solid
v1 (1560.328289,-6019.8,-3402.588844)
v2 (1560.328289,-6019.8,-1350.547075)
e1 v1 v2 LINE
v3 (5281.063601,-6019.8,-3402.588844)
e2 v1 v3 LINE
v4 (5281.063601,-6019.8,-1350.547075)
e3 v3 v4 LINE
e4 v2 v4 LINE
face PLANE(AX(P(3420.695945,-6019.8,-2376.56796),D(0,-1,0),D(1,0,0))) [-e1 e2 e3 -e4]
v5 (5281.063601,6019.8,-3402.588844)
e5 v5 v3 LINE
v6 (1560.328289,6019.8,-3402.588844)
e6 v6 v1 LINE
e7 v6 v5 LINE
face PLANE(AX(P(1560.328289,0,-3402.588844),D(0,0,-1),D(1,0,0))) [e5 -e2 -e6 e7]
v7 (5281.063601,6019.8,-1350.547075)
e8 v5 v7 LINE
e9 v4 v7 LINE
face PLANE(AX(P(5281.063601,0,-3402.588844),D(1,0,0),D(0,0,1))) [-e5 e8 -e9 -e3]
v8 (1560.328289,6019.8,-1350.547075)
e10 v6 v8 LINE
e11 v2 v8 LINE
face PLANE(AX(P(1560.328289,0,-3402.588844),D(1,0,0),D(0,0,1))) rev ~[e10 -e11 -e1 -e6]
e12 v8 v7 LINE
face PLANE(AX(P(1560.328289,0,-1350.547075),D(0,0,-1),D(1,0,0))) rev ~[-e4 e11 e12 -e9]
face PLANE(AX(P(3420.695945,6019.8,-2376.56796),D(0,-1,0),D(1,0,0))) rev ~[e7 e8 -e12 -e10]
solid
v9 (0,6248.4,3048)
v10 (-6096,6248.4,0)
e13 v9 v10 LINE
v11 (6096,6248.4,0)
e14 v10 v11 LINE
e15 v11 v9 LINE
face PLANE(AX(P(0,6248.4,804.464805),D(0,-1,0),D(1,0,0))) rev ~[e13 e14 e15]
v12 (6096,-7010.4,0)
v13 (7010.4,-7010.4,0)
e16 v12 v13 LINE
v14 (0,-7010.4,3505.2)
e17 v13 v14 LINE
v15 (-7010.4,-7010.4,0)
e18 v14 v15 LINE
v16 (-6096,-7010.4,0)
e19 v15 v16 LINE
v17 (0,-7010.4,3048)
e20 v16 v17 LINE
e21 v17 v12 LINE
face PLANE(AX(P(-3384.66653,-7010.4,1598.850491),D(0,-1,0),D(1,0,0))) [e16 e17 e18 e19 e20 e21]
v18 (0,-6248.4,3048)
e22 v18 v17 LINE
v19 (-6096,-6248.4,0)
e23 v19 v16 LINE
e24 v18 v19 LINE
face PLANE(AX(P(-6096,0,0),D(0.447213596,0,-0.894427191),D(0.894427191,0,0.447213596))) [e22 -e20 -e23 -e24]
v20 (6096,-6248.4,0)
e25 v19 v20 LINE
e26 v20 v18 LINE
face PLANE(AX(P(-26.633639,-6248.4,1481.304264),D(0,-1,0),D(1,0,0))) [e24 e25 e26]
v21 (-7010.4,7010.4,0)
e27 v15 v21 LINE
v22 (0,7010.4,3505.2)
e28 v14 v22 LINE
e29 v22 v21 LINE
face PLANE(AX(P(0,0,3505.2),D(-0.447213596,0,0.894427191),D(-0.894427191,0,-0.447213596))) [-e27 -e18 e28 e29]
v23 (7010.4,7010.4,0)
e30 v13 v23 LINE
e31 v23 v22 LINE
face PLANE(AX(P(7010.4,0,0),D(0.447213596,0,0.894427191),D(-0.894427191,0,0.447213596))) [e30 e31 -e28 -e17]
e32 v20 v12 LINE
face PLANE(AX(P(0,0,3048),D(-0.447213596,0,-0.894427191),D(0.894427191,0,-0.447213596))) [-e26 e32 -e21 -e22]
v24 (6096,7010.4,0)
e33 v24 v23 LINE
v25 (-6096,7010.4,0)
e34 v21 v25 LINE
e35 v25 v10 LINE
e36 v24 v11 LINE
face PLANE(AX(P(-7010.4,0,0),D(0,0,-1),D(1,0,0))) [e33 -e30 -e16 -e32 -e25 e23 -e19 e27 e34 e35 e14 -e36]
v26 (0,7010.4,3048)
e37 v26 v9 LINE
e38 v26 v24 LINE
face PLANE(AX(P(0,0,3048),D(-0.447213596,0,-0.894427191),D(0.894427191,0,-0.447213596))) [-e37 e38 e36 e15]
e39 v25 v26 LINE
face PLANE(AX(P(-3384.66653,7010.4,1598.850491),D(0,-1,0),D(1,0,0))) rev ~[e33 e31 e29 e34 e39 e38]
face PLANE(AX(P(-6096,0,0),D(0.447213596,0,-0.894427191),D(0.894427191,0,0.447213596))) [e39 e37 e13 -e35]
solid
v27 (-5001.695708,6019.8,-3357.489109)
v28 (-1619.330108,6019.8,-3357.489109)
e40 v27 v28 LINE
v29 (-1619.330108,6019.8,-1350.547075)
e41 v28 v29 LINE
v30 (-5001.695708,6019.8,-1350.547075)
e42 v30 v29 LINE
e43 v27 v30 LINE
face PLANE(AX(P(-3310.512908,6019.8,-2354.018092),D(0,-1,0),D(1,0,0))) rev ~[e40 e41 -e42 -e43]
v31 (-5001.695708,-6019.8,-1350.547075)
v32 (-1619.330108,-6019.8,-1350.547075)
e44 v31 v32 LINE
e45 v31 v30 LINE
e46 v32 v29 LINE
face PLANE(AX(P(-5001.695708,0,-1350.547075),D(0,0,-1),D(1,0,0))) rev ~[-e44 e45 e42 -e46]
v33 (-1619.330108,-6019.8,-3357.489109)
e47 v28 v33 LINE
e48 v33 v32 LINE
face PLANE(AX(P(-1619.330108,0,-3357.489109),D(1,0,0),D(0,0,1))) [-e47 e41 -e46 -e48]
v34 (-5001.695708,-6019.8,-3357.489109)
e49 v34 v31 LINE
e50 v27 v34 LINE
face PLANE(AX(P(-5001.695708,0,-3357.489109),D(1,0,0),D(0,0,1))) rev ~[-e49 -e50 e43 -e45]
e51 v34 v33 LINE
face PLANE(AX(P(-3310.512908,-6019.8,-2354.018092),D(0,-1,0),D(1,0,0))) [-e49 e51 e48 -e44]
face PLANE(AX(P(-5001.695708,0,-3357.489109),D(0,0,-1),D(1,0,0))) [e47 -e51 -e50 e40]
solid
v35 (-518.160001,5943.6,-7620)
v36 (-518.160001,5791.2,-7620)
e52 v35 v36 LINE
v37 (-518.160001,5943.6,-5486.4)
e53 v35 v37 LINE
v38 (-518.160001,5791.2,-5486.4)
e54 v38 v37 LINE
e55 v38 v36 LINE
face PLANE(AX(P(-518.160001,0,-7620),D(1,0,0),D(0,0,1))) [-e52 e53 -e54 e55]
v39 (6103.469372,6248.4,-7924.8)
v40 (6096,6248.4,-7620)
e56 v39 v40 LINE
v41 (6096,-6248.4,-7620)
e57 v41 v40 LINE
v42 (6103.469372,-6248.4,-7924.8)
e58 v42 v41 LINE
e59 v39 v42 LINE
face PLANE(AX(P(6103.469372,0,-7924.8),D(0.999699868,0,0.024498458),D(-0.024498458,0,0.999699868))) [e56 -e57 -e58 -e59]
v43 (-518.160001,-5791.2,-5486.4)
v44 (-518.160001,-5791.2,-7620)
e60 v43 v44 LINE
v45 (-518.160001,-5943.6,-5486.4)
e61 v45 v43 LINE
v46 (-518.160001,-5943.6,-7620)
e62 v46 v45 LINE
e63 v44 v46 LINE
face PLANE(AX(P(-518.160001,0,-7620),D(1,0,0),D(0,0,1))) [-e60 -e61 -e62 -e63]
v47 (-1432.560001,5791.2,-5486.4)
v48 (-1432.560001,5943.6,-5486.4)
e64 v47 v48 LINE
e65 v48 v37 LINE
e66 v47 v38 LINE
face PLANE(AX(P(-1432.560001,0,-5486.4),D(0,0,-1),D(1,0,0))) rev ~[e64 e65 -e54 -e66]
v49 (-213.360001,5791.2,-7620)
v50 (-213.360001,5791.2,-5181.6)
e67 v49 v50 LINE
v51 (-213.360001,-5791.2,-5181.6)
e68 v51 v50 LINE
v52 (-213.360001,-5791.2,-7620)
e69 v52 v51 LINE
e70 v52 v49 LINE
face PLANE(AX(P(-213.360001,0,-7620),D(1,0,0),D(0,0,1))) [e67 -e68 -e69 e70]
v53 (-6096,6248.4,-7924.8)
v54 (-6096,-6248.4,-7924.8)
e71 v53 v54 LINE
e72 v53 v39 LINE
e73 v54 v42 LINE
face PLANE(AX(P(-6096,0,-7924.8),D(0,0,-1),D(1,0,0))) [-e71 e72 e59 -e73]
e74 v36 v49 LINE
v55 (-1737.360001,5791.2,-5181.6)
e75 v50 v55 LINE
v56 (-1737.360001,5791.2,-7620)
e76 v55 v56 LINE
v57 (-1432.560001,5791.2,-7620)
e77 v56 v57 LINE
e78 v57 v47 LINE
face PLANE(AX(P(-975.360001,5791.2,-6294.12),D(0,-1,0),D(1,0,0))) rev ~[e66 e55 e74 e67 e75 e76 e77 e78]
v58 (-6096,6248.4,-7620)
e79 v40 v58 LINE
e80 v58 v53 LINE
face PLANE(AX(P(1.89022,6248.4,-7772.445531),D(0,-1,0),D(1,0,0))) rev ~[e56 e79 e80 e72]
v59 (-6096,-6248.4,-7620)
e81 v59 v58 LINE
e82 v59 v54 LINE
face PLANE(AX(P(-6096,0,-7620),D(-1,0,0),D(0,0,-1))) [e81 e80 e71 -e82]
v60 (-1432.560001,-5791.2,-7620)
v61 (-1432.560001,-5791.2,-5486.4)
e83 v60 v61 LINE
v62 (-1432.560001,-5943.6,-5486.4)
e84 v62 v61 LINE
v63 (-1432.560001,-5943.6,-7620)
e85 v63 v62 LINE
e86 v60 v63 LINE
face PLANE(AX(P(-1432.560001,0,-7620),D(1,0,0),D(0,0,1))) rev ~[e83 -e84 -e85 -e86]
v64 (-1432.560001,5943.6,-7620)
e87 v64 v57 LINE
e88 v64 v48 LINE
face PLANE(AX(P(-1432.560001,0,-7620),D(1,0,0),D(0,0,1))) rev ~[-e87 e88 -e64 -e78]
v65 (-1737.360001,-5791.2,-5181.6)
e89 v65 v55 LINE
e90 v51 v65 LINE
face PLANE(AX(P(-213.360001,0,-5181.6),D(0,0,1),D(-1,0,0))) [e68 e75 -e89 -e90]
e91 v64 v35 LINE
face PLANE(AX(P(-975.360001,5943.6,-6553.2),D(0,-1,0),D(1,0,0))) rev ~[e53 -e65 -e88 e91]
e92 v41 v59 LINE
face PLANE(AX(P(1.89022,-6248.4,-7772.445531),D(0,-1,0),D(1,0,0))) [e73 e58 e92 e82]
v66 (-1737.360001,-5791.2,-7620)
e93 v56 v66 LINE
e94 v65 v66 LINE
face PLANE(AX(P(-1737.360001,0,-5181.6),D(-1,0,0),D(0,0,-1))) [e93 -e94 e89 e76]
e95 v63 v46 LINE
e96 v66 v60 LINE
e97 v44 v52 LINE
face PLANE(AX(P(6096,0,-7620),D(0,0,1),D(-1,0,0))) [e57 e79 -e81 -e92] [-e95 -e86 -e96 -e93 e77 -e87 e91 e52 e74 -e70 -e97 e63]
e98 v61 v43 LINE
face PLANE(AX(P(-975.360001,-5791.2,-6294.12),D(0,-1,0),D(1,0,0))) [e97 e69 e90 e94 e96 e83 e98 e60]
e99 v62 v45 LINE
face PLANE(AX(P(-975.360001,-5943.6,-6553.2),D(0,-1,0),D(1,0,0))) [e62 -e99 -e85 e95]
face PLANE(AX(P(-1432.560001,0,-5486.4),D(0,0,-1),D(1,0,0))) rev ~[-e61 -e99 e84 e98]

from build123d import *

# Parameters (mm, degrees)
F1_DEPTH = 7010.4
F0_W     = 1828.8
F0_H     = 1524
F2_DEPTH = 6248.4
F3_DEPTH = 6248.4
F4_DEPTH = 6248.4
F0_W_2   = 3382.3656
F0_H_2   = 2006.9420337677
F6_DEPTH = 6019.8
F0_W_3   = 3720.7353115082
F0_H_3   = 2052.0417690277
F7_DEPTH = 6019.8
F0_W_4   = 914.4
F0_H_4   = 2133.6
F8_DEPTH = 5943.6
F9_DEPTH = 5791.2


# Not quite as in the source:
# - the program builds the solid bodies; features that only make, move or delete a surface that nothing else refers to are left out


with BuildPart() as f1:
    # F0 (on Front) → F1 (new body, symmetric)
    with BuildSketch(Plane.XZ):
        Polygon((-7010.4, 0), (-6096, 0), (0, 3048), (0, 3505.2), align=None)
        Polygon((0, 3048), (6096, 0), (7010.4, 0), (0, 3505.2), align=None)
    extrude(amount=F1_DEPTH, both=True)

    # F0 (on Front) → F2 (join, symmetric)
    with BuildSketch(Plane.XZ):
        Polygon((-6096, 0), (0, 0), (6096, 0), (0, 3048), align=None)
        with Locations((-26.6336387634, 1481.3042635918)):
            Rectangle(F0_W, F0_H, mode=Mode.SUBTRACT)
    extrude(amount=F2_DEPTH, both=True)

    # F0 (on Front) → F3 (join, symmetric)
    with BuildSketch(Plane.XZ):
        with Locations((-26.6336387634, 1481.3042635918)):
            Rectangle(F0_W, F0_H)
    extrude(amount=F3_DEPTH, both=True)


with BuildPart() as f4:
    # F0 (on Front) → F4 (new body, symmetric)
    with BuildSketch(Plane.XZ):
        Polygon((-1737.3600006104, -7620), (-6096, -7620), (-6096, -7924.8), (6103.4693717957, -7924.8), (6096, -7620), (-213.3600006104, -7620), (-518.1600006104, -7620), (-1432.5600006104, -7620), align=None)
    extrude(amount=F4_DEPTH, both=True)

    # F0 (on Front) → F8 (join, symmetric)
    with BuildSketch(Plane.XZ):
        with Locations((-975.3600006104, -6553.2)):
            Rectangle(F0_W_4, F0_H_4)
    extrude(amount=F8_DEPTH, both=True)

    # F0 (on Front) → F9 (join, symmetric)
    with BuildSketch(Plane.XZ):
        Polygon((-1737.3600006104, -5181.6), (-1737.3600006104, -7620), (-1432.5600006104, -7620), (-1432.5600006104, -5486.4), (-518.1600006104, -5486.4), (-518.1600006104, -7620), (-213.3600006104, -7620), (-213.3600006104, -5181.6), align=None)
    extrude(amount=F9_DEPTH, both=True)


with BuildPart() as f6:
    # F0 (on Front) → F6 (new body, symmetric)
    with BuildSketch(Plane.XZ):
        with Locations((-3310.5129081657, -2354.0180921555)):
            Rectangle(F0_W_2, F0_H_2)
    extrude(amount=F6_DEPTH, both=True)


with BuildPart() as f7:
    # F0 (on Front) → F7 (new body, symmetric)
    with BuildSketch(Plane.XZ):
        with Locations((3420.6959448952, -2376.5679597855)):
            Rectangle(F0_W_3, F0_H_3)
    extrude(amount=F7_DEPTH, both=True)


solid = Compound([f1.part, f4.part, f6.part, f7.part])
